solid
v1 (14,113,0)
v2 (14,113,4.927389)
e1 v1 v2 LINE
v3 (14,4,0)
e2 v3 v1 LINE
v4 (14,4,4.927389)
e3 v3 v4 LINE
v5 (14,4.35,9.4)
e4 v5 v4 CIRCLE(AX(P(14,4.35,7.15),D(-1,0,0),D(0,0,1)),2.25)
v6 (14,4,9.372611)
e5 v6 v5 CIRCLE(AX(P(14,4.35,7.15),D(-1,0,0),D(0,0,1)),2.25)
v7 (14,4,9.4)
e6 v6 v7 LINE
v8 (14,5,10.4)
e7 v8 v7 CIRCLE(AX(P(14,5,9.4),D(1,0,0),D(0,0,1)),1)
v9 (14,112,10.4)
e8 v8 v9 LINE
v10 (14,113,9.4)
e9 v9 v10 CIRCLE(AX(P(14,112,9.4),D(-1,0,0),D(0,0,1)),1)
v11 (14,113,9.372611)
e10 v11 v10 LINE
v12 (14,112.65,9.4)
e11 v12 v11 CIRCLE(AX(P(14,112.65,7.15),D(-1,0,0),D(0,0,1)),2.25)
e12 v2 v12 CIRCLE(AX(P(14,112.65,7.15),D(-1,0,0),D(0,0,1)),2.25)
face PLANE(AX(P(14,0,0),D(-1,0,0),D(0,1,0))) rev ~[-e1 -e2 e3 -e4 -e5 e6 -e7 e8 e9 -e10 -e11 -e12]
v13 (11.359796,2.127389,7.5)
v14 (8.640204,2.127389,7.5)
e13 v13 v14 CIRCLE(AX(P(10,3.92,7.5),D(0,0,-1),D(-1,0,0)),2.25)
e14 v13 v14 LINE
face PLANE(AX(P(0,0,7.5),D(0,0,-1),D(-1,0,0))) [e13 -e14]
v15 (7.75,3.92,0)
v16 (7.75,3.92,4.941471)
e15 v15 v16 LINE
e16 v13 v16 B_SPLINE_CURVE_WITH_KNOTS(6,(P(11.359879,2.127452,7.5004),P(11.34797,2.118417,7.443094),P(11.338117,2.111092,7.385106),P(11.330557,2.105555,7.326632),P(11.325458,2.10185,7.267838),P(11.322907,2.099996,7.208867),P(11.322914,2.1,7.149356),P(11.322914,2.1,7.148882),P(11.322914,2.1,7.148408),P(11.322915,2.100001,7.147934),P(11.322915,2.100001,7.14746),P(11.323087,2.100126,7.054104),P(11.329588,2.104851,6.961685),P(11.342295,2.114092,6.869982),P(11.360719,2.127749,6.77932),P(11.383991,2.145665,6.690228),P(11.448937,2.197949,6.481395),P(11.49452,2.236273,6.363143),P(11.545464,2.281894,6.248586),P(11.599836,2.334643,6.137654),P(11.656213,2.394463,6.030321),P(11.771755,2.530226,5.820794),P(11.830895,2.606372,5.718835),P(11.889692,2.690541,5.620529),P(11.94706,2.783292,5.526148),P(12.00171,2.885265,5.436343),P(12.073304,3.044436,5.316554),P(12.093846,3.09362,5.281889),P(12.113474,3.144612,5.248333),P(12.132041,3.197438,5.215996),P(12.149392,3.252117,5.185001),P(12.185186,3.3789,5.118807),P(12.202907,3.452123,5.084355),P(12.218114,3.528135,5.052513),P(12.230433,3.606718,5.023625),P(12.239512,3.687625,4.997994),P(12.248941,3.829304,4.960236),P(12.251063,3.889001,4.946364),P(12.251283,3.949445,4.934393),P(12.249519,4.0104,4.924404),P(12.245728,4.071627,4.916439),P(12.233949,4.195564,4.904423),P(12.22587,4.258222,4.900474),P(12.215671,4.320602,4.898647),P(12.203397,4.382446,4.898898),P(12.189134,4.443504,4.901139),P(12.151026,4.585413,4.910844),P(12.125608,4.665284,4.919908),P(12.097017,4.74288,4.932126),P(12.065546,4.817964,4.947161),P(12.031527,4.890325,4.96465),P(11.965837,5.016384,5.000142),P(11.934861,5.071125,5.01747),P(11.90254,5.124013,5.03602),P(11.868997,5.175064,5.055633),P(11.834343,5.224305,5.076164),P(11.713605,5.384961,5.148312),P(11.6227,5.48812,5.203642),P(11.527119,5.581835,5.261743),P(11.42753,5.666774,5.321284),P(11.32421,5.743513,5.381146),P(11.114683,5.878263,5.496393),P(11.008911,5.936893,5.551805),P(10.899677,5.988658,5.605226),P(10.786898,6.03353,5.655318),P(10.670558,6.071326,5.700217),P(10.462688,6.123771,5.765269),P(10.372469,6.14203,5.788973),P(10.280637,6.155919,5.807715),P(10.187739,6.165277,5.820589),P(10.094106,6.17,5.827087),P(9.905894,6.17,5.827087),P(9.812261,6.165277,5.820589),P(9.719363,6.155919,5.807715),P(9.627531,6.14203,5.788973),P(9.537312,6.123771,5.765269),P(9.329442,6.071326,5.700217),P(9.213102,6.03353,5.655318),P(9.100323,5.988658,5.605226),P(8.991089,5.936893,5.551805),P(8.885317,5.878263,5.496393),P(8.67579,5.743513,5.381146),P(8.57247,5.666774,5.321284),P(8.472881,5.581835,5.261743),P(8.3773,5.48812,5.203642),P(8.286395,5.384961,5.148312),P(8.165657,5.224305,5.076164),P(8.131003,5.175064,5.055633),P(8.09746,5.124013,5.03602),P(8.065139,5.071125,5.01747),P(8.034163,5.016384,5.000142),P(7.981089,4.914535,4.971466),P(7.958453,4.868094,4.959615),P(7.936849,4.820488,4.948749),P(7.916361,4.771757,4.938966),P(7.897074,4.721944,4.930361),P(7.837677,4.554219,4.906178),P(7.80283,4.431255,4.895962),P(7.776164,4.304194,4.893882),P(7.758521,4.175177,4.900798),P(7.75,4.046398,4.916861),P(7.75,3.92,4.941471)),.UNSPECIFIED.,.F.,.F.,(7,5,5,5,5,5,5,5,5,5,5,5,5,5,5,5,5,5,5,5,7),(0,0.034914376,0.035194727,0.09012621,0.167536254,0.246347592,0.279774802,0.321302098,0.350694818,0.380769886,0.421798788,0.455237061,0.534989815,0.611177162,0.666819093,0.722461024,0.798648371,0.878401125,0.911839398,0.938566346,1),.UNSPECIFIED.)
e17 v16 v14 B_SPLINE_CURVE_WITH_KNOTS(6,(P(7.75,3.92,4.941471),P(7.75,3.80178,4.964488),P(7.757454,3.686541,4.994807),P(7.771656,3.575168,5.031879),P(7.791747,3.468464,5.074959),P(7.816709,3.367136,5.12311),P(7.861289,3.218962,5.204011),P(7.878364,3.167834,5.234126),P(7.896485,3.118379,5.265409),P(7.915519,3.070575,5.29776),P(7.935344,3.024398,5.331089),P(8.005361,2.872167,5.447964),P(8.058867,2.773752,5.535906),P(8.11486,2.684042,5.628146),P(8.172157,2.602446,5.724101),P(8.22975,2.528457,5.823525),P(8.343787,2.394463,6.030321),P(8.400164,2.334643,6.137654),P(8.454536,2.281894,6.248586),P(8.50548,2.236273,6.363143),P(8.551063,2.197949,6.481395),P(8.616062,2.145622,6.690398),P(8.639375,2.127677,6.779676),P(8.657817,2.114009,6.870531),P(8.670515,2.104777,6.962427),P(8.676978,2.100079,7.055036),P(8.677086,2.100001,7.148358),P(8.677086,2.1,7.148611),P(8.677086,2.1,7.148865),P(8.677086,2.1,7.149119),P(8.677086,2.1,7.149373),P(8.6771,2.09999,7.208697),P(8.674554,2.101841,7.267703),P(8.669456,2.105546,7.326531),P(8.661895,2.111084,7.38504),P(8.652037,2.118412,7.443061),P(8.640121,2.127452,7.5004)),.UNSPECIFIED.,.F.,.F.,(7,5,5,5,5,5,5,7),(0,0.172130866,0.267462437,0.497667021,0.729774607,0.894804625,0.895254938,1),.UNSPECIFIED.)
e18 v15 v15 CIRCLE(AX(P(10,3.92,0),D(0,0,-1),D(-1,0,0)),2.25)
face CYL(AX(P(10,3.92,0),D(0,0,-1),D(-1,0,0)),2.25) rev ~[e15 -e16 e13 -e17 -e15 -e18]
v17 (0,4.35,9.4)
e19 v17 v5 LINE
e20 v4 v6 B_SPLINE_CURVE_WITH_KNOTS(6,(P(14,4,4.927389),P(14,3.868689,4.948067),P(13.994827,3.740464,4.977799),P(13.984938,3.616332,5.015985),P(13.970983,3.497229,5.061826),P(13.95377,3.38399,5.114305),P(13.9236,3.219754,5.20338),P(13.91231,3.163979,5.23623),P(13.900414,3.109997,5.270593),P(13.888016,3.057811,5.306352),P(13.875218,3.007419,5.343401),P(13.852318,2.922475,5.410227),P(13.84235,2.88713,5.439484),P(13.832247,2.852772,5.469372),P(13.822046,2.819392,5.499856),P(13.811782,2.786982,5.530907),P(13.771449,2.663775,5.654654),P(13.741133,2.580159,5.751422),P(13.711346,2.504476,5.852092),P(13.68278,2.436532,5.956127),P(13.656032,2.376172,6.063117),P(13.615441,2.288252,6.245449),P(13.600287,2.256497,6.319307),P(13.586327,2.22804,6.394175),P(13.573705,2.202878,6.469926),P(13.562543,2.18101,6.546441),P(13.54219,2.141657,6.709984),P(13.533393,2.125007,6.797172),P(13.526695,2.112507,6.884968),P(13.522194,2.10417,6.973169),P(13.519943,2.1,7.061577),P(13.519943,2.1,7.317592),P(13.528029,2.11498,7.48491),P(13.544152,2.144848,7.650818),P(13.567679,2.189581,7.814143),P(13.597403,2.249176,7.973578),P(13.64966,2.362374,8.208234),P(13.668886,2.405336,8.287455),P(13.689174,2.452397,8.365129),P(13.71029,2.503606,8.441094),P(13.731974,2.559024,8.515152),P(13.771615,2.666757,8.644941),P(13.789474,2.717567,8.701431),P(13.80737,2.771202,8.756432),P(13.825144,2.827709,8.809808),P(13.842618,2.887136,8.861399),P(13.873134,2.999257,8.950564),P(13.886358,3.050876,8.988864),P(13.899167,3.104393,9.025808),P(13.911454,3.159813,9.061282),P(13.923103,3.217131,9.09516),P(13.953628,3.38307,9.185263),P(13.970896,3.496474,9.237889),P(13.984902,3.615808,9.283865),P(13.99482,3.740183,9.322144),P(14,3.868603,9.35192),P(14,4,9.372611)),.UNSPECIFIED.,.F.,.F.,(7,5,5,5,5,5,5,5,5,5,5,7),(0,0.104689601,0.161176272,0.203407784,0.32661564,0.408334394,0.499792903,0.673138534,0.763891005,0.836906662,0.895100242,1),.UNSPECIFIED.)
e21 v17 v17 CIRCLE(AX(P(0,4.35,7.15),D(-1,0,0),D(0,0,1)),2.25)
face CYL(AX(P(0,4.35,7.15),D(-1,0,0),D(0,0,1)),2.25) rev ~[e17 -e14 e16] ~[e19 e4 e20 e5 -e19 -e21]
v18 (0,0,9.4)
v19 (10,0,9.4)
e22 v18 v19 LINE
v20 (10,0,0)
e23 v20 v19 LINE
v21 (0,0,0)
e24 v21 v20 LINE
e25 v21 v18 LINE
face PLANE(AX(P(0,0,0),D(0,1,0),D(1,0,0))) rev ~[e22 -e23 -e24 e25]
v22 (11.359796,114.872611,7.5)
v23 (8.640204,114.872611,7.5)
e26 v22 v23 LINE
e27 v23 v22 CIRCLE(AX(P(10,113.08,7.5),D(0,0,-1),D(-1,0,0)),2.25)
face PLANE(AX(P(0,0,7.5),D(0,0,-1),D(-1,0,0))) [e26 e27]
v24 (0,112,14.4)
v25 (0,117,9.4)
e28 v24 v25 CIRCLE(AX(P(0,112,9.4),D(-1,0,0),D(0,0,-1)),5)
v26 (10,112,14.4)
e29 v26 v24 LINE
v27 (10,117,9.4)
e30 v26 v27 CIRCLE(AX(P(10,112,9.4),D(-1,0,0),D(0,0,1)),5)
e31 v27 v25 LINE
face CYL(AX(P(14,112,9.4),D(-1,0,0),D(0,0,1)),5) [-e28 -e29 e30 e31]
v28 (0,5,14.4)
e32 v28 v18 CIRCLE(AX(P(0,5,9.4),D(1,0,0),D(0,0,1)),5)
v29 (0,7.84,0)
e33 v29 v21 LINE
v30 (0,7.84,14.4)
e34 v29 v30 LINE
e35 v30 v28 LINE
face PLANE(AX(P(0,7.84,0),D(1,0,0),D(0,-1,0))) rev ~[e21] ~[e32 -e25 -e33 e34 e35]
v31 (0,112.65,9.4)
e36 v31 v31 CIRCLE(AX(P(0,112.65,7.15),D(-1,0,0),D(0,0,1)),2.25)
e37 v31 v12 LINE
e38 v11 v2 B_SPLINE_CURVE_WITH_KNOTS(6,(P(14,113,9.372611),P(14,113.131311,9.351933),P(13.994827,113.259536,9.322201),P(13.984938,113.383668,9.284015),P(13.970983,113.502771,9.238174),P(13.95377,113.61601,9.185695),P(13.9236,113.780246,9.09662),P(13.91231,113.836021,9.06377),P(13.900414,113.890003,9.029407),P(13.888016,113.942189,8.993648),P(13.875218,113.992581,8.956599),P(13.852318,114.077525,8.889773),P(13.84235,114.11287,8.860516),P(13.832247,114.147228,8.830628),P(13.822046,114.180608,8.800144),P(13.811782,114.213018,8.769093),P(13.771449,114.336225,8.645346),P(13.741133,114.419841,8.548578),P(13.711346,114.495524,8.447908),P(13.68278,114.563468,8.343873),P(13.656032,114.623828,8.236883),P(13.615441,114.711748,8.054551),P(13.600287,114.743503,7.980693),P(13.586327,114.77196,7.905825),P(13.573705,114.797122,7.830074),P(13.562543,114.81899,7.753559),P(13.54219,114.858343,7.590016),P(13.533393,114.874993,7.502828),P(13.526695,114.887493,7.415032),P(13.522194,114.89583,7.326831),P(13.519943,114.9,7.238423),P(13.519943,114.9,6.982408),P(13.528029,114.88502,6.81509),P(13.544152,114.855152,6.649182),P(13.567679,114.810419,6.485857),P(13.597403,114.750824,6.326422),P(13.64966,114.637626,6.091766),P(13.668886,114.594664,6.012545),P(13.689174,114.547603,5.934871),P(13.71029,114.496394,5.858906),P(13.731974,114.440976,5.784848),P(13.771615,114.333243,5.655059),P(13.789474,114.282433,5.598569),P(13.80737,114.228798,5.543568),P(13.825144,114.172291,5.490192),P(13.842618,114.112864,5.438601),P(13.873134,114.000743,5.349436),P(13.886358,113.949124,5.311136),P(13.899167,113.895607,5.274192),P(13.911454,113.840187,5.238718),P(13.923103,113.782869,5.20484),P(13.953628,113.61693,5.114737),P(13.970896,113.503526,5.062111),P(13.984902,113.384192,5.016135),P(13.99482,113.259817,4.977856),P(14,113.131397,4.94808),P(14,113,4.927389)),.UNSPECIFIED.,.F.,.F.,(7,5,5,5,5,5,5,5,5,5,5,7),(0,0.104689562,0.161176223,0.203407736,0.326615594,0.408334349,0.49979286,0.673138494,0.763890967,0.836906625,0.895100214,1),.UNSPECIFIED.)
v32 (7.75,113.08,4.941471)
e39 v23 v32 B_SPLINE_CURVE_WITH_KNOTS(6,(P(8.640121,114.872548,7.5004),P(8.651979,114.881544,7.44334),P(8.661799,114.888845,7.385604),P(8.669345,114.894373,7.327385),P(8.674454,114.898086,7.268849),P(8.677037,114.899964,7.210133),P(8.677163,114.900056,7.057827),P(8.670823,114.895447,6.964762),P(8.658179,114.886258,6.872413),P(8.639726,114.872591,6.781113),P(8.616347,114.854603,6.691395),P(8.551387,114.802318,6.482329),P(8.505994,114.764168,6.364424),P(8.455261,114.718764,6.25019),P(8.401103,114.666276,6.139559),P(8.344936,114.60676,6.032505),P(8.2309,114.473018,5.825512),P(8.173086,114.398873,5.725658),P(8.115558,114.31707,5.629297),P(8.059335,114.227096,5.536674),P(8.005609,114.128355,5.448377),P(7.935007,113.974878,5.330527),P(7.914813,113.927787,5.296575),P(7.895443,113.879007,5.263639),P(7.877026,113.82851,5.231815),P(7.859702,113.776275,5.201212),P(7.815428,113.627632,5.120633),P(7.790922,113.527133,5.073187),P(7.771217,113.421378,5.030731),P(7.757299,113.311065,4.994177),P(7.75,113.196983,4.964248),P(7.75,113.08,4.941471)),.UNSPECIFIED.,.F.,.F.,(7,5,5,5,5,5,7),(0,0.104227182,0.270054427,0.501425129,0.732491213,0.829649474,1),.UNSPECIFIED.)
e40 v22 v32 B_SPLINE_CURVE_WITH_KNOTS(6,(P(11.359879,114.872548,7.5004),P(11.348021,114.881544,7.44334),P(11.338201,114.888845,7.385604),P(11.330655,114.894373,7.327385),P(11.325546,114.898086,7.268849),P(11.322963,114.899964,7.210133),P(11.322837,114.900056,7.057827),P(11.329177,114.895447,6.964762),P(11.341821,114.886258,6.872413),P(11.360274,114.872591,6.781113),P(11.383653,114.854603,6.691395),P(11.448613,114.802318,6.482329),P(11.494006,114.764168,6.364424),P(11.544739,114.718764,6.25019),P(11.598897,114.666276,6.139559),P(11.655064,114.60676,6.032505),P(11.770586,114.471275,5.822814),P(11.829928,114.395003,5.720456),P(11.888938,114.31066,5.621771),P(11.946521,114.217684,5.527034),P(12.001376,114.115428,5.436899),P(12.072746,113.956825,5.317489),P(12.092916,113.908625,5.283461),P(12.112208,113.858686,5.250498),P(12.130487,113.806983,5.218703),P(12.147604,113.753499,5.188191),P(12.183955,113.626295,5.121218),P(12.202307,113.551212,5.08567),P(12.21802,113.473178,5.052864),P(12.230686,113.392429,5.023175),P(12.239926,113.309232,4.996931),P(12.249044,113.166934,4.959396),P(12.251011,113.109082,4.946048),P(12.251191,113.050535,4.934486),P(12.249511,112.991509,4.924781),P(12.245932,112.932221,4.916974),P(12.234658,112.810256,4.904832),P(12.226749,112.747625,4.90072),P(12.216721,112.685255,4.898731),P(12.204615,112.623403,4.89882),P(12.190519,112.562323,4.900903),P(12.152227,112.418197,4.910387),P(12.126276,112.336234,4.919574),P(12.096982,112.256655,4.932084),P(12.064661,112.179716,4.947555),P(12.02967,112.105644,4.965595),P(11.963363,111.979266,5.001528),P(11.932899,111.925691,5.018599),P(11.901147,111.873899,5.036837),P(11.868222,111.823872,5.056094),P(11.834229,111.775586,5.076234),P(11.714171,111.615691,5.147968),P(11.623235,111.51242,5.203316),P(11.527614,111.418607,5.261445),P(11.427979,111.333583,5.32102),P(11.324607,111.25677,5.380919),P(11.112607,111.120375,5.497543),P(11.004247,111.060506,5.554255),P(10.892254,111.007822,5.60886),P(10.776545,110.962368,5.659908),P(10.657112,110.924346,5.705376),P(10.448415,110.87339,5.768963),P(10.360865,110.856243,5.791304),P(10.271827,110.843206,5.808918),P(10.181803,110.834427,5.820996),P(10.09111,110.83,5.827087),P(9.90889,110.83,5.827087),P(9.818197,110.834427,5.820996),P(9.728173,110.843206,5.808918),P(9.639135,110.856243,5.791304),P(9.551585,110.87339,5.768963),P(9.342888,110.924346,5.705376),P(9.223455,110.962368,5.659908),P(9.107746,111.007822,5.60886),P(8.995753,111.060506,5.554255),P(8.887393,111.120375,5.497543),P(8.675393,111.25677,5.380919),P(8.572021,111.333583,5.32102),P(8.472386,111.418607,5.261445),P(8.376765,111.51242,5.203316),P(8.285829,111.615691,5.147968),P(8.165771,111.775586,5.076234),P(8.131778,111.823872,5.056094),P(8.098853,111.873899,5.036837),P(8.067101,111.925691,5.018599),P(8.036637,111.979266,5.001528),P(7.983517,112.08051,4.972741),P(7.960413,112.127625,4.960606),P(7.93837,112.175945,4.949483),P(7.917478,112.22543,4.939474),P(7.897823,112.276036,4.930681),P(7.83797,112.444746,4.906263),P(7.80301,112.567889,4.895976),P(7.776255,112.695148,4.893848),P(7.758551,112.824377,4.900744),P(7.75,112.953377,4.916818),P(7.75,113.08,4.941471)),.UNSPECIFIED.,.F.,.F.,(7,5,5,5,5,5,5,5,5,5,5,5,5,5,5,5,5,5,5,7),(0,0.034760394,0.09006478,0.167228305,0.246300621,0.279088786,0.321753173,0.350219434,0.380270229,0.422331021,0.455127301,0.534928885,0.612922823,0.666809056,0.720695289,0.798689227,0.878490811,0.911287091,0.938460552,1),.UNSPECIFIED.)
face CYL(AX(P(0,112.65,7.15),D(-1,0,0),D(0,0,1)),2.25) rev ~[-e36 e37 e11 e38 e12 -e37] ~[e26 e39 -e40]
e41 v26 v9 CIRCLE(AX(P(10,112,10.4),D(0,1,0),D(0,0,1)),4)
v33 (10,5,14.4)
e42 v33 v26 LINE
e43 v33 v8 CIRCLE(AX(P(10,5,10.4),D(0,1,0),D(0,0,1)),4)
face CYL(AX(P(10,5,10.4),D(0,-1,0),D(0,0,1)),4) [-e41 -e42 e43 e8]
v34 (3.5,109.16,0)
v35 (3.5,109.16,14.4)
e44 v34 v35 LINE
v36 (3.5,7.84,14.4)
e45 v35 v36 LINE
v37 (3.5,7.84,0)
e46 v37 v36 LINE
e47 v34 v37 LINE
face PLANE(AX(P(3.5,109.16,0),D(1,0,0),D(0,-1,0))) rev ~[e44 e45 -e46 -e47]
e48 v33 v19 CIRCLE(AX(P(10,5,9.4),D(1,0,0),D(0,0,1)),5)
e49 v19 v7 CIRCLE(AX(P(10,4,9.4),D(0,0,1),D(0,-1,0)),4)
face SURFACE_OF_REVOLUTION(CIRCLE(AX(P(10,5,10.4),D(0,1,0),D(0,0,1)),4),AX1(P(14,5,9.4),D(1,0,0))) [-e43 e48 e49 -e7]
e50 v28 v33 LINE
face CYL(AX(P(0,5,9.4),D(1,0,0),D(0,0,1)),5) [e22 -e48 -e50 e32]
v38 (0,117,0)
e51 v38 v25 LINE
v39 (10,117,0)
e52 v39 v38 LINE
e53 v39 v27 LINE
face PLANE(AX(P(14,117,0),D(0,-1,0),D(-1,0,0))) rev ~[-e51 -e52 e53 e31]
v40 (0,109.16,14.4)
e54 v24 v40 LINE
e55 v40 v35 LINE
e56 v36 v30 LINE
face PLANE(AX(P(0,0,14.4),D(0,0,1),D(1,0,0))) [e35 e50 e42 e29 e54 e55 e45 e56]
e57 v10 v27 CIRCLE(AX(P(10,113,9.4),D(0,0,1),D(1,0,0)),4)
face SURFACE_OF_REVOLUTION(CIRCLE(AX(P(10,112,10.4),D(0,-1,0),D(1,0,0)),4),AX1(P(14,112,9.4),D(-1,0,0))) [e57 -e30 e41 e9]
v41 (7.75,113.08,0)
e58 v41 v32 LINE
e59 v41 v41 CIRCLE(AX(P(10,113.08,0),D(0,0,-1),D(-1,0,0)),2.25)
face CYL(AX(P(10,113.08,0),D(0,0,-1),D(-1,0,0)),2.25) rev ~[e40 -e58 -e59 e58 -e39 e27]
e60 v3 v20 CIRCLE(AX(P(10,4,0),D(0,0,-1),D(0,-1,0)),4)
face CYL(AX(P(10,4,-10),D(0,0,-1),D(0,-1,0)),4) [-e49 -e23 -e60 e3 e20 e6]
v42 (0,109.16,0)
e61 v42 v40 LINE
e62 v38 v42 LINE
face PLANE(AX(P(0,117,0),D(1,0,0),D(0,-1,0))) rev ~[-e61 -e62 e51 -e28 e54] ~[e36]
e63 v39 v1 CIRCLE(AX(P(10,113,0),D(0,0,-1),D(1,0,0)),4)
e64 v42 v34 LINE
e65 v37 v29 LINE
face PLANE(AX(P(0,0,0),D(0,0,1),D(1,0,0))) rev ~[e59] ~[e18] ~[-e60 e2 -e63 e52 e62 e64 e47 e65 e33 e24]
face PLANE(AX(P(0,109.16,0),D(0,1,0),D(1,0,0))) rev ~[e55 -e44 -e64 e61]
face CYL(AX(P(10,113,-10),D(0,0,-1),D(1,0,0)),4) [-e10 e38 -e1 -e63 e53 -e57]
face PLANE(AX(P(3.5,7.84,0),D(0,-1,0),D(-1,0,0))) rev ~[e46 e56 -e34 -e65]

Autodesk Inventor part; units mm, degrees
ref_plane "YZ Plane" through (0, 0, 0) normal (1, 0, 0) x (0, 1, 0)
ref_plane "XZ Plane" through (0, 0, 0) normal (0, 1, 0) x (-1, 0, 0)
ref_plane "XY Plane" through (0, 0, 0) normal (0, 0, 1) x (1, 0, 0)
sketch "スケッチ1" plane through (0, 0, 0) normal (0, 0, 1) x (1, 0, 0)
  line L0 (0, 0) -> (14, 0)
  line L1 (14, 0) -> (14, 117)
  line L2 (14, 117) -> (0, 117)
  line L3 (0, 117) -> (0, 109.16)
  line L4 (0, 109.16) -> (3.5, 109.16)
  line L5 (3.5, 109.16) -> (3.5, 7.84)
  line L6 (3.5, 7.84) -> (0, 7.84)
  line L7 (0, 7.84) -> (0, 0)
  dimension "d0" = 117
  dimension "d1" = 3.5
  dimension "d2" = 7.84
  dimension "d3" = 14
extrude "押し出し1" add sketch "スケッチ1" along normal blind 14.4
sketch "スケッチ2" plane through (0, 0, 0) normal (-1, 0, 0) x (0, 0, 1)
  line L0 (0, 117) -> (14.4, 117) construction
  line L1 (0, 0) -> (14.4, 0) construction
  line L2 (0, 117) -> (14.4, 117) construction
  line L3 (7.15, 117) -> (7.15, 0) construction
  line L4 (0, 0) -> (14.4, 0) construction
  circle A0 centre (7.15, 4.35) radius 1.8 construction
  line L5 (7.15, 4.35) -> (5.35, 4.35) construction
  line L6 (0, 7.84) -> (0, 0) construction
  circle A1 centre (7.15, 4.35) radius 2.25
  line L7 (7.15, 58.5) -> (14.4, 58.5) construction
  line L8 (14.4, 0) -> (14.4, 117) projected
  circle A2 centre (7.15, 112.65) radius 2.25
  point P0 (7.15, 2.55)
  dimension "d6" = 3.6
  dimension "d7" = 5.35
  dimension "d8" = 2.55
  dimension "d9" = 4.5
extrude "押し出し2" cut sketch "スケッチ2" against normal through all
fillet "フィレット1" radius 5 2 edges at (7, 0, 14.4) (7, 117, 14.4)
sketch "スケッチ3" plane through (0, 0, 0) normal (0, 0, -1) x (-1, 0, 0)
  line L0 (0, 7.84) -> (0, 0) construction
  line L1 (-14, 0) -> (-14, 117) construction
  line L2 (0, 117) -> (0, 109.16) construction
  line L3 (0, 3.92) -> (-14, 3.92) construction
  circle A0 centre (-10, 3.92) radius 2.25
  line L4 (-14, 5) -> (-14, 112) construction
  line L5 (-14, 58.5) -> (-3.7036, 58.5) construction
  circle A1 centre (-10, 113.08) radius 2.25
  dimension "d13" = 7.84
  dimension "d14" = 4.5
  dimension "d17" = 4
extrude "押し出し3" cut sketch "スケッチ3" against normal blind 7.5
fillet "フィレット2" radius 4 5 edges at (14, 1.4645, 12.9355) (14, 58.5, 14.4) (14, 115.5355, 12.9355) (14, 117, 4.7) (14, 0, 4.7)
properties part number "small_gpu_03" material "アルミニウム 6061"
